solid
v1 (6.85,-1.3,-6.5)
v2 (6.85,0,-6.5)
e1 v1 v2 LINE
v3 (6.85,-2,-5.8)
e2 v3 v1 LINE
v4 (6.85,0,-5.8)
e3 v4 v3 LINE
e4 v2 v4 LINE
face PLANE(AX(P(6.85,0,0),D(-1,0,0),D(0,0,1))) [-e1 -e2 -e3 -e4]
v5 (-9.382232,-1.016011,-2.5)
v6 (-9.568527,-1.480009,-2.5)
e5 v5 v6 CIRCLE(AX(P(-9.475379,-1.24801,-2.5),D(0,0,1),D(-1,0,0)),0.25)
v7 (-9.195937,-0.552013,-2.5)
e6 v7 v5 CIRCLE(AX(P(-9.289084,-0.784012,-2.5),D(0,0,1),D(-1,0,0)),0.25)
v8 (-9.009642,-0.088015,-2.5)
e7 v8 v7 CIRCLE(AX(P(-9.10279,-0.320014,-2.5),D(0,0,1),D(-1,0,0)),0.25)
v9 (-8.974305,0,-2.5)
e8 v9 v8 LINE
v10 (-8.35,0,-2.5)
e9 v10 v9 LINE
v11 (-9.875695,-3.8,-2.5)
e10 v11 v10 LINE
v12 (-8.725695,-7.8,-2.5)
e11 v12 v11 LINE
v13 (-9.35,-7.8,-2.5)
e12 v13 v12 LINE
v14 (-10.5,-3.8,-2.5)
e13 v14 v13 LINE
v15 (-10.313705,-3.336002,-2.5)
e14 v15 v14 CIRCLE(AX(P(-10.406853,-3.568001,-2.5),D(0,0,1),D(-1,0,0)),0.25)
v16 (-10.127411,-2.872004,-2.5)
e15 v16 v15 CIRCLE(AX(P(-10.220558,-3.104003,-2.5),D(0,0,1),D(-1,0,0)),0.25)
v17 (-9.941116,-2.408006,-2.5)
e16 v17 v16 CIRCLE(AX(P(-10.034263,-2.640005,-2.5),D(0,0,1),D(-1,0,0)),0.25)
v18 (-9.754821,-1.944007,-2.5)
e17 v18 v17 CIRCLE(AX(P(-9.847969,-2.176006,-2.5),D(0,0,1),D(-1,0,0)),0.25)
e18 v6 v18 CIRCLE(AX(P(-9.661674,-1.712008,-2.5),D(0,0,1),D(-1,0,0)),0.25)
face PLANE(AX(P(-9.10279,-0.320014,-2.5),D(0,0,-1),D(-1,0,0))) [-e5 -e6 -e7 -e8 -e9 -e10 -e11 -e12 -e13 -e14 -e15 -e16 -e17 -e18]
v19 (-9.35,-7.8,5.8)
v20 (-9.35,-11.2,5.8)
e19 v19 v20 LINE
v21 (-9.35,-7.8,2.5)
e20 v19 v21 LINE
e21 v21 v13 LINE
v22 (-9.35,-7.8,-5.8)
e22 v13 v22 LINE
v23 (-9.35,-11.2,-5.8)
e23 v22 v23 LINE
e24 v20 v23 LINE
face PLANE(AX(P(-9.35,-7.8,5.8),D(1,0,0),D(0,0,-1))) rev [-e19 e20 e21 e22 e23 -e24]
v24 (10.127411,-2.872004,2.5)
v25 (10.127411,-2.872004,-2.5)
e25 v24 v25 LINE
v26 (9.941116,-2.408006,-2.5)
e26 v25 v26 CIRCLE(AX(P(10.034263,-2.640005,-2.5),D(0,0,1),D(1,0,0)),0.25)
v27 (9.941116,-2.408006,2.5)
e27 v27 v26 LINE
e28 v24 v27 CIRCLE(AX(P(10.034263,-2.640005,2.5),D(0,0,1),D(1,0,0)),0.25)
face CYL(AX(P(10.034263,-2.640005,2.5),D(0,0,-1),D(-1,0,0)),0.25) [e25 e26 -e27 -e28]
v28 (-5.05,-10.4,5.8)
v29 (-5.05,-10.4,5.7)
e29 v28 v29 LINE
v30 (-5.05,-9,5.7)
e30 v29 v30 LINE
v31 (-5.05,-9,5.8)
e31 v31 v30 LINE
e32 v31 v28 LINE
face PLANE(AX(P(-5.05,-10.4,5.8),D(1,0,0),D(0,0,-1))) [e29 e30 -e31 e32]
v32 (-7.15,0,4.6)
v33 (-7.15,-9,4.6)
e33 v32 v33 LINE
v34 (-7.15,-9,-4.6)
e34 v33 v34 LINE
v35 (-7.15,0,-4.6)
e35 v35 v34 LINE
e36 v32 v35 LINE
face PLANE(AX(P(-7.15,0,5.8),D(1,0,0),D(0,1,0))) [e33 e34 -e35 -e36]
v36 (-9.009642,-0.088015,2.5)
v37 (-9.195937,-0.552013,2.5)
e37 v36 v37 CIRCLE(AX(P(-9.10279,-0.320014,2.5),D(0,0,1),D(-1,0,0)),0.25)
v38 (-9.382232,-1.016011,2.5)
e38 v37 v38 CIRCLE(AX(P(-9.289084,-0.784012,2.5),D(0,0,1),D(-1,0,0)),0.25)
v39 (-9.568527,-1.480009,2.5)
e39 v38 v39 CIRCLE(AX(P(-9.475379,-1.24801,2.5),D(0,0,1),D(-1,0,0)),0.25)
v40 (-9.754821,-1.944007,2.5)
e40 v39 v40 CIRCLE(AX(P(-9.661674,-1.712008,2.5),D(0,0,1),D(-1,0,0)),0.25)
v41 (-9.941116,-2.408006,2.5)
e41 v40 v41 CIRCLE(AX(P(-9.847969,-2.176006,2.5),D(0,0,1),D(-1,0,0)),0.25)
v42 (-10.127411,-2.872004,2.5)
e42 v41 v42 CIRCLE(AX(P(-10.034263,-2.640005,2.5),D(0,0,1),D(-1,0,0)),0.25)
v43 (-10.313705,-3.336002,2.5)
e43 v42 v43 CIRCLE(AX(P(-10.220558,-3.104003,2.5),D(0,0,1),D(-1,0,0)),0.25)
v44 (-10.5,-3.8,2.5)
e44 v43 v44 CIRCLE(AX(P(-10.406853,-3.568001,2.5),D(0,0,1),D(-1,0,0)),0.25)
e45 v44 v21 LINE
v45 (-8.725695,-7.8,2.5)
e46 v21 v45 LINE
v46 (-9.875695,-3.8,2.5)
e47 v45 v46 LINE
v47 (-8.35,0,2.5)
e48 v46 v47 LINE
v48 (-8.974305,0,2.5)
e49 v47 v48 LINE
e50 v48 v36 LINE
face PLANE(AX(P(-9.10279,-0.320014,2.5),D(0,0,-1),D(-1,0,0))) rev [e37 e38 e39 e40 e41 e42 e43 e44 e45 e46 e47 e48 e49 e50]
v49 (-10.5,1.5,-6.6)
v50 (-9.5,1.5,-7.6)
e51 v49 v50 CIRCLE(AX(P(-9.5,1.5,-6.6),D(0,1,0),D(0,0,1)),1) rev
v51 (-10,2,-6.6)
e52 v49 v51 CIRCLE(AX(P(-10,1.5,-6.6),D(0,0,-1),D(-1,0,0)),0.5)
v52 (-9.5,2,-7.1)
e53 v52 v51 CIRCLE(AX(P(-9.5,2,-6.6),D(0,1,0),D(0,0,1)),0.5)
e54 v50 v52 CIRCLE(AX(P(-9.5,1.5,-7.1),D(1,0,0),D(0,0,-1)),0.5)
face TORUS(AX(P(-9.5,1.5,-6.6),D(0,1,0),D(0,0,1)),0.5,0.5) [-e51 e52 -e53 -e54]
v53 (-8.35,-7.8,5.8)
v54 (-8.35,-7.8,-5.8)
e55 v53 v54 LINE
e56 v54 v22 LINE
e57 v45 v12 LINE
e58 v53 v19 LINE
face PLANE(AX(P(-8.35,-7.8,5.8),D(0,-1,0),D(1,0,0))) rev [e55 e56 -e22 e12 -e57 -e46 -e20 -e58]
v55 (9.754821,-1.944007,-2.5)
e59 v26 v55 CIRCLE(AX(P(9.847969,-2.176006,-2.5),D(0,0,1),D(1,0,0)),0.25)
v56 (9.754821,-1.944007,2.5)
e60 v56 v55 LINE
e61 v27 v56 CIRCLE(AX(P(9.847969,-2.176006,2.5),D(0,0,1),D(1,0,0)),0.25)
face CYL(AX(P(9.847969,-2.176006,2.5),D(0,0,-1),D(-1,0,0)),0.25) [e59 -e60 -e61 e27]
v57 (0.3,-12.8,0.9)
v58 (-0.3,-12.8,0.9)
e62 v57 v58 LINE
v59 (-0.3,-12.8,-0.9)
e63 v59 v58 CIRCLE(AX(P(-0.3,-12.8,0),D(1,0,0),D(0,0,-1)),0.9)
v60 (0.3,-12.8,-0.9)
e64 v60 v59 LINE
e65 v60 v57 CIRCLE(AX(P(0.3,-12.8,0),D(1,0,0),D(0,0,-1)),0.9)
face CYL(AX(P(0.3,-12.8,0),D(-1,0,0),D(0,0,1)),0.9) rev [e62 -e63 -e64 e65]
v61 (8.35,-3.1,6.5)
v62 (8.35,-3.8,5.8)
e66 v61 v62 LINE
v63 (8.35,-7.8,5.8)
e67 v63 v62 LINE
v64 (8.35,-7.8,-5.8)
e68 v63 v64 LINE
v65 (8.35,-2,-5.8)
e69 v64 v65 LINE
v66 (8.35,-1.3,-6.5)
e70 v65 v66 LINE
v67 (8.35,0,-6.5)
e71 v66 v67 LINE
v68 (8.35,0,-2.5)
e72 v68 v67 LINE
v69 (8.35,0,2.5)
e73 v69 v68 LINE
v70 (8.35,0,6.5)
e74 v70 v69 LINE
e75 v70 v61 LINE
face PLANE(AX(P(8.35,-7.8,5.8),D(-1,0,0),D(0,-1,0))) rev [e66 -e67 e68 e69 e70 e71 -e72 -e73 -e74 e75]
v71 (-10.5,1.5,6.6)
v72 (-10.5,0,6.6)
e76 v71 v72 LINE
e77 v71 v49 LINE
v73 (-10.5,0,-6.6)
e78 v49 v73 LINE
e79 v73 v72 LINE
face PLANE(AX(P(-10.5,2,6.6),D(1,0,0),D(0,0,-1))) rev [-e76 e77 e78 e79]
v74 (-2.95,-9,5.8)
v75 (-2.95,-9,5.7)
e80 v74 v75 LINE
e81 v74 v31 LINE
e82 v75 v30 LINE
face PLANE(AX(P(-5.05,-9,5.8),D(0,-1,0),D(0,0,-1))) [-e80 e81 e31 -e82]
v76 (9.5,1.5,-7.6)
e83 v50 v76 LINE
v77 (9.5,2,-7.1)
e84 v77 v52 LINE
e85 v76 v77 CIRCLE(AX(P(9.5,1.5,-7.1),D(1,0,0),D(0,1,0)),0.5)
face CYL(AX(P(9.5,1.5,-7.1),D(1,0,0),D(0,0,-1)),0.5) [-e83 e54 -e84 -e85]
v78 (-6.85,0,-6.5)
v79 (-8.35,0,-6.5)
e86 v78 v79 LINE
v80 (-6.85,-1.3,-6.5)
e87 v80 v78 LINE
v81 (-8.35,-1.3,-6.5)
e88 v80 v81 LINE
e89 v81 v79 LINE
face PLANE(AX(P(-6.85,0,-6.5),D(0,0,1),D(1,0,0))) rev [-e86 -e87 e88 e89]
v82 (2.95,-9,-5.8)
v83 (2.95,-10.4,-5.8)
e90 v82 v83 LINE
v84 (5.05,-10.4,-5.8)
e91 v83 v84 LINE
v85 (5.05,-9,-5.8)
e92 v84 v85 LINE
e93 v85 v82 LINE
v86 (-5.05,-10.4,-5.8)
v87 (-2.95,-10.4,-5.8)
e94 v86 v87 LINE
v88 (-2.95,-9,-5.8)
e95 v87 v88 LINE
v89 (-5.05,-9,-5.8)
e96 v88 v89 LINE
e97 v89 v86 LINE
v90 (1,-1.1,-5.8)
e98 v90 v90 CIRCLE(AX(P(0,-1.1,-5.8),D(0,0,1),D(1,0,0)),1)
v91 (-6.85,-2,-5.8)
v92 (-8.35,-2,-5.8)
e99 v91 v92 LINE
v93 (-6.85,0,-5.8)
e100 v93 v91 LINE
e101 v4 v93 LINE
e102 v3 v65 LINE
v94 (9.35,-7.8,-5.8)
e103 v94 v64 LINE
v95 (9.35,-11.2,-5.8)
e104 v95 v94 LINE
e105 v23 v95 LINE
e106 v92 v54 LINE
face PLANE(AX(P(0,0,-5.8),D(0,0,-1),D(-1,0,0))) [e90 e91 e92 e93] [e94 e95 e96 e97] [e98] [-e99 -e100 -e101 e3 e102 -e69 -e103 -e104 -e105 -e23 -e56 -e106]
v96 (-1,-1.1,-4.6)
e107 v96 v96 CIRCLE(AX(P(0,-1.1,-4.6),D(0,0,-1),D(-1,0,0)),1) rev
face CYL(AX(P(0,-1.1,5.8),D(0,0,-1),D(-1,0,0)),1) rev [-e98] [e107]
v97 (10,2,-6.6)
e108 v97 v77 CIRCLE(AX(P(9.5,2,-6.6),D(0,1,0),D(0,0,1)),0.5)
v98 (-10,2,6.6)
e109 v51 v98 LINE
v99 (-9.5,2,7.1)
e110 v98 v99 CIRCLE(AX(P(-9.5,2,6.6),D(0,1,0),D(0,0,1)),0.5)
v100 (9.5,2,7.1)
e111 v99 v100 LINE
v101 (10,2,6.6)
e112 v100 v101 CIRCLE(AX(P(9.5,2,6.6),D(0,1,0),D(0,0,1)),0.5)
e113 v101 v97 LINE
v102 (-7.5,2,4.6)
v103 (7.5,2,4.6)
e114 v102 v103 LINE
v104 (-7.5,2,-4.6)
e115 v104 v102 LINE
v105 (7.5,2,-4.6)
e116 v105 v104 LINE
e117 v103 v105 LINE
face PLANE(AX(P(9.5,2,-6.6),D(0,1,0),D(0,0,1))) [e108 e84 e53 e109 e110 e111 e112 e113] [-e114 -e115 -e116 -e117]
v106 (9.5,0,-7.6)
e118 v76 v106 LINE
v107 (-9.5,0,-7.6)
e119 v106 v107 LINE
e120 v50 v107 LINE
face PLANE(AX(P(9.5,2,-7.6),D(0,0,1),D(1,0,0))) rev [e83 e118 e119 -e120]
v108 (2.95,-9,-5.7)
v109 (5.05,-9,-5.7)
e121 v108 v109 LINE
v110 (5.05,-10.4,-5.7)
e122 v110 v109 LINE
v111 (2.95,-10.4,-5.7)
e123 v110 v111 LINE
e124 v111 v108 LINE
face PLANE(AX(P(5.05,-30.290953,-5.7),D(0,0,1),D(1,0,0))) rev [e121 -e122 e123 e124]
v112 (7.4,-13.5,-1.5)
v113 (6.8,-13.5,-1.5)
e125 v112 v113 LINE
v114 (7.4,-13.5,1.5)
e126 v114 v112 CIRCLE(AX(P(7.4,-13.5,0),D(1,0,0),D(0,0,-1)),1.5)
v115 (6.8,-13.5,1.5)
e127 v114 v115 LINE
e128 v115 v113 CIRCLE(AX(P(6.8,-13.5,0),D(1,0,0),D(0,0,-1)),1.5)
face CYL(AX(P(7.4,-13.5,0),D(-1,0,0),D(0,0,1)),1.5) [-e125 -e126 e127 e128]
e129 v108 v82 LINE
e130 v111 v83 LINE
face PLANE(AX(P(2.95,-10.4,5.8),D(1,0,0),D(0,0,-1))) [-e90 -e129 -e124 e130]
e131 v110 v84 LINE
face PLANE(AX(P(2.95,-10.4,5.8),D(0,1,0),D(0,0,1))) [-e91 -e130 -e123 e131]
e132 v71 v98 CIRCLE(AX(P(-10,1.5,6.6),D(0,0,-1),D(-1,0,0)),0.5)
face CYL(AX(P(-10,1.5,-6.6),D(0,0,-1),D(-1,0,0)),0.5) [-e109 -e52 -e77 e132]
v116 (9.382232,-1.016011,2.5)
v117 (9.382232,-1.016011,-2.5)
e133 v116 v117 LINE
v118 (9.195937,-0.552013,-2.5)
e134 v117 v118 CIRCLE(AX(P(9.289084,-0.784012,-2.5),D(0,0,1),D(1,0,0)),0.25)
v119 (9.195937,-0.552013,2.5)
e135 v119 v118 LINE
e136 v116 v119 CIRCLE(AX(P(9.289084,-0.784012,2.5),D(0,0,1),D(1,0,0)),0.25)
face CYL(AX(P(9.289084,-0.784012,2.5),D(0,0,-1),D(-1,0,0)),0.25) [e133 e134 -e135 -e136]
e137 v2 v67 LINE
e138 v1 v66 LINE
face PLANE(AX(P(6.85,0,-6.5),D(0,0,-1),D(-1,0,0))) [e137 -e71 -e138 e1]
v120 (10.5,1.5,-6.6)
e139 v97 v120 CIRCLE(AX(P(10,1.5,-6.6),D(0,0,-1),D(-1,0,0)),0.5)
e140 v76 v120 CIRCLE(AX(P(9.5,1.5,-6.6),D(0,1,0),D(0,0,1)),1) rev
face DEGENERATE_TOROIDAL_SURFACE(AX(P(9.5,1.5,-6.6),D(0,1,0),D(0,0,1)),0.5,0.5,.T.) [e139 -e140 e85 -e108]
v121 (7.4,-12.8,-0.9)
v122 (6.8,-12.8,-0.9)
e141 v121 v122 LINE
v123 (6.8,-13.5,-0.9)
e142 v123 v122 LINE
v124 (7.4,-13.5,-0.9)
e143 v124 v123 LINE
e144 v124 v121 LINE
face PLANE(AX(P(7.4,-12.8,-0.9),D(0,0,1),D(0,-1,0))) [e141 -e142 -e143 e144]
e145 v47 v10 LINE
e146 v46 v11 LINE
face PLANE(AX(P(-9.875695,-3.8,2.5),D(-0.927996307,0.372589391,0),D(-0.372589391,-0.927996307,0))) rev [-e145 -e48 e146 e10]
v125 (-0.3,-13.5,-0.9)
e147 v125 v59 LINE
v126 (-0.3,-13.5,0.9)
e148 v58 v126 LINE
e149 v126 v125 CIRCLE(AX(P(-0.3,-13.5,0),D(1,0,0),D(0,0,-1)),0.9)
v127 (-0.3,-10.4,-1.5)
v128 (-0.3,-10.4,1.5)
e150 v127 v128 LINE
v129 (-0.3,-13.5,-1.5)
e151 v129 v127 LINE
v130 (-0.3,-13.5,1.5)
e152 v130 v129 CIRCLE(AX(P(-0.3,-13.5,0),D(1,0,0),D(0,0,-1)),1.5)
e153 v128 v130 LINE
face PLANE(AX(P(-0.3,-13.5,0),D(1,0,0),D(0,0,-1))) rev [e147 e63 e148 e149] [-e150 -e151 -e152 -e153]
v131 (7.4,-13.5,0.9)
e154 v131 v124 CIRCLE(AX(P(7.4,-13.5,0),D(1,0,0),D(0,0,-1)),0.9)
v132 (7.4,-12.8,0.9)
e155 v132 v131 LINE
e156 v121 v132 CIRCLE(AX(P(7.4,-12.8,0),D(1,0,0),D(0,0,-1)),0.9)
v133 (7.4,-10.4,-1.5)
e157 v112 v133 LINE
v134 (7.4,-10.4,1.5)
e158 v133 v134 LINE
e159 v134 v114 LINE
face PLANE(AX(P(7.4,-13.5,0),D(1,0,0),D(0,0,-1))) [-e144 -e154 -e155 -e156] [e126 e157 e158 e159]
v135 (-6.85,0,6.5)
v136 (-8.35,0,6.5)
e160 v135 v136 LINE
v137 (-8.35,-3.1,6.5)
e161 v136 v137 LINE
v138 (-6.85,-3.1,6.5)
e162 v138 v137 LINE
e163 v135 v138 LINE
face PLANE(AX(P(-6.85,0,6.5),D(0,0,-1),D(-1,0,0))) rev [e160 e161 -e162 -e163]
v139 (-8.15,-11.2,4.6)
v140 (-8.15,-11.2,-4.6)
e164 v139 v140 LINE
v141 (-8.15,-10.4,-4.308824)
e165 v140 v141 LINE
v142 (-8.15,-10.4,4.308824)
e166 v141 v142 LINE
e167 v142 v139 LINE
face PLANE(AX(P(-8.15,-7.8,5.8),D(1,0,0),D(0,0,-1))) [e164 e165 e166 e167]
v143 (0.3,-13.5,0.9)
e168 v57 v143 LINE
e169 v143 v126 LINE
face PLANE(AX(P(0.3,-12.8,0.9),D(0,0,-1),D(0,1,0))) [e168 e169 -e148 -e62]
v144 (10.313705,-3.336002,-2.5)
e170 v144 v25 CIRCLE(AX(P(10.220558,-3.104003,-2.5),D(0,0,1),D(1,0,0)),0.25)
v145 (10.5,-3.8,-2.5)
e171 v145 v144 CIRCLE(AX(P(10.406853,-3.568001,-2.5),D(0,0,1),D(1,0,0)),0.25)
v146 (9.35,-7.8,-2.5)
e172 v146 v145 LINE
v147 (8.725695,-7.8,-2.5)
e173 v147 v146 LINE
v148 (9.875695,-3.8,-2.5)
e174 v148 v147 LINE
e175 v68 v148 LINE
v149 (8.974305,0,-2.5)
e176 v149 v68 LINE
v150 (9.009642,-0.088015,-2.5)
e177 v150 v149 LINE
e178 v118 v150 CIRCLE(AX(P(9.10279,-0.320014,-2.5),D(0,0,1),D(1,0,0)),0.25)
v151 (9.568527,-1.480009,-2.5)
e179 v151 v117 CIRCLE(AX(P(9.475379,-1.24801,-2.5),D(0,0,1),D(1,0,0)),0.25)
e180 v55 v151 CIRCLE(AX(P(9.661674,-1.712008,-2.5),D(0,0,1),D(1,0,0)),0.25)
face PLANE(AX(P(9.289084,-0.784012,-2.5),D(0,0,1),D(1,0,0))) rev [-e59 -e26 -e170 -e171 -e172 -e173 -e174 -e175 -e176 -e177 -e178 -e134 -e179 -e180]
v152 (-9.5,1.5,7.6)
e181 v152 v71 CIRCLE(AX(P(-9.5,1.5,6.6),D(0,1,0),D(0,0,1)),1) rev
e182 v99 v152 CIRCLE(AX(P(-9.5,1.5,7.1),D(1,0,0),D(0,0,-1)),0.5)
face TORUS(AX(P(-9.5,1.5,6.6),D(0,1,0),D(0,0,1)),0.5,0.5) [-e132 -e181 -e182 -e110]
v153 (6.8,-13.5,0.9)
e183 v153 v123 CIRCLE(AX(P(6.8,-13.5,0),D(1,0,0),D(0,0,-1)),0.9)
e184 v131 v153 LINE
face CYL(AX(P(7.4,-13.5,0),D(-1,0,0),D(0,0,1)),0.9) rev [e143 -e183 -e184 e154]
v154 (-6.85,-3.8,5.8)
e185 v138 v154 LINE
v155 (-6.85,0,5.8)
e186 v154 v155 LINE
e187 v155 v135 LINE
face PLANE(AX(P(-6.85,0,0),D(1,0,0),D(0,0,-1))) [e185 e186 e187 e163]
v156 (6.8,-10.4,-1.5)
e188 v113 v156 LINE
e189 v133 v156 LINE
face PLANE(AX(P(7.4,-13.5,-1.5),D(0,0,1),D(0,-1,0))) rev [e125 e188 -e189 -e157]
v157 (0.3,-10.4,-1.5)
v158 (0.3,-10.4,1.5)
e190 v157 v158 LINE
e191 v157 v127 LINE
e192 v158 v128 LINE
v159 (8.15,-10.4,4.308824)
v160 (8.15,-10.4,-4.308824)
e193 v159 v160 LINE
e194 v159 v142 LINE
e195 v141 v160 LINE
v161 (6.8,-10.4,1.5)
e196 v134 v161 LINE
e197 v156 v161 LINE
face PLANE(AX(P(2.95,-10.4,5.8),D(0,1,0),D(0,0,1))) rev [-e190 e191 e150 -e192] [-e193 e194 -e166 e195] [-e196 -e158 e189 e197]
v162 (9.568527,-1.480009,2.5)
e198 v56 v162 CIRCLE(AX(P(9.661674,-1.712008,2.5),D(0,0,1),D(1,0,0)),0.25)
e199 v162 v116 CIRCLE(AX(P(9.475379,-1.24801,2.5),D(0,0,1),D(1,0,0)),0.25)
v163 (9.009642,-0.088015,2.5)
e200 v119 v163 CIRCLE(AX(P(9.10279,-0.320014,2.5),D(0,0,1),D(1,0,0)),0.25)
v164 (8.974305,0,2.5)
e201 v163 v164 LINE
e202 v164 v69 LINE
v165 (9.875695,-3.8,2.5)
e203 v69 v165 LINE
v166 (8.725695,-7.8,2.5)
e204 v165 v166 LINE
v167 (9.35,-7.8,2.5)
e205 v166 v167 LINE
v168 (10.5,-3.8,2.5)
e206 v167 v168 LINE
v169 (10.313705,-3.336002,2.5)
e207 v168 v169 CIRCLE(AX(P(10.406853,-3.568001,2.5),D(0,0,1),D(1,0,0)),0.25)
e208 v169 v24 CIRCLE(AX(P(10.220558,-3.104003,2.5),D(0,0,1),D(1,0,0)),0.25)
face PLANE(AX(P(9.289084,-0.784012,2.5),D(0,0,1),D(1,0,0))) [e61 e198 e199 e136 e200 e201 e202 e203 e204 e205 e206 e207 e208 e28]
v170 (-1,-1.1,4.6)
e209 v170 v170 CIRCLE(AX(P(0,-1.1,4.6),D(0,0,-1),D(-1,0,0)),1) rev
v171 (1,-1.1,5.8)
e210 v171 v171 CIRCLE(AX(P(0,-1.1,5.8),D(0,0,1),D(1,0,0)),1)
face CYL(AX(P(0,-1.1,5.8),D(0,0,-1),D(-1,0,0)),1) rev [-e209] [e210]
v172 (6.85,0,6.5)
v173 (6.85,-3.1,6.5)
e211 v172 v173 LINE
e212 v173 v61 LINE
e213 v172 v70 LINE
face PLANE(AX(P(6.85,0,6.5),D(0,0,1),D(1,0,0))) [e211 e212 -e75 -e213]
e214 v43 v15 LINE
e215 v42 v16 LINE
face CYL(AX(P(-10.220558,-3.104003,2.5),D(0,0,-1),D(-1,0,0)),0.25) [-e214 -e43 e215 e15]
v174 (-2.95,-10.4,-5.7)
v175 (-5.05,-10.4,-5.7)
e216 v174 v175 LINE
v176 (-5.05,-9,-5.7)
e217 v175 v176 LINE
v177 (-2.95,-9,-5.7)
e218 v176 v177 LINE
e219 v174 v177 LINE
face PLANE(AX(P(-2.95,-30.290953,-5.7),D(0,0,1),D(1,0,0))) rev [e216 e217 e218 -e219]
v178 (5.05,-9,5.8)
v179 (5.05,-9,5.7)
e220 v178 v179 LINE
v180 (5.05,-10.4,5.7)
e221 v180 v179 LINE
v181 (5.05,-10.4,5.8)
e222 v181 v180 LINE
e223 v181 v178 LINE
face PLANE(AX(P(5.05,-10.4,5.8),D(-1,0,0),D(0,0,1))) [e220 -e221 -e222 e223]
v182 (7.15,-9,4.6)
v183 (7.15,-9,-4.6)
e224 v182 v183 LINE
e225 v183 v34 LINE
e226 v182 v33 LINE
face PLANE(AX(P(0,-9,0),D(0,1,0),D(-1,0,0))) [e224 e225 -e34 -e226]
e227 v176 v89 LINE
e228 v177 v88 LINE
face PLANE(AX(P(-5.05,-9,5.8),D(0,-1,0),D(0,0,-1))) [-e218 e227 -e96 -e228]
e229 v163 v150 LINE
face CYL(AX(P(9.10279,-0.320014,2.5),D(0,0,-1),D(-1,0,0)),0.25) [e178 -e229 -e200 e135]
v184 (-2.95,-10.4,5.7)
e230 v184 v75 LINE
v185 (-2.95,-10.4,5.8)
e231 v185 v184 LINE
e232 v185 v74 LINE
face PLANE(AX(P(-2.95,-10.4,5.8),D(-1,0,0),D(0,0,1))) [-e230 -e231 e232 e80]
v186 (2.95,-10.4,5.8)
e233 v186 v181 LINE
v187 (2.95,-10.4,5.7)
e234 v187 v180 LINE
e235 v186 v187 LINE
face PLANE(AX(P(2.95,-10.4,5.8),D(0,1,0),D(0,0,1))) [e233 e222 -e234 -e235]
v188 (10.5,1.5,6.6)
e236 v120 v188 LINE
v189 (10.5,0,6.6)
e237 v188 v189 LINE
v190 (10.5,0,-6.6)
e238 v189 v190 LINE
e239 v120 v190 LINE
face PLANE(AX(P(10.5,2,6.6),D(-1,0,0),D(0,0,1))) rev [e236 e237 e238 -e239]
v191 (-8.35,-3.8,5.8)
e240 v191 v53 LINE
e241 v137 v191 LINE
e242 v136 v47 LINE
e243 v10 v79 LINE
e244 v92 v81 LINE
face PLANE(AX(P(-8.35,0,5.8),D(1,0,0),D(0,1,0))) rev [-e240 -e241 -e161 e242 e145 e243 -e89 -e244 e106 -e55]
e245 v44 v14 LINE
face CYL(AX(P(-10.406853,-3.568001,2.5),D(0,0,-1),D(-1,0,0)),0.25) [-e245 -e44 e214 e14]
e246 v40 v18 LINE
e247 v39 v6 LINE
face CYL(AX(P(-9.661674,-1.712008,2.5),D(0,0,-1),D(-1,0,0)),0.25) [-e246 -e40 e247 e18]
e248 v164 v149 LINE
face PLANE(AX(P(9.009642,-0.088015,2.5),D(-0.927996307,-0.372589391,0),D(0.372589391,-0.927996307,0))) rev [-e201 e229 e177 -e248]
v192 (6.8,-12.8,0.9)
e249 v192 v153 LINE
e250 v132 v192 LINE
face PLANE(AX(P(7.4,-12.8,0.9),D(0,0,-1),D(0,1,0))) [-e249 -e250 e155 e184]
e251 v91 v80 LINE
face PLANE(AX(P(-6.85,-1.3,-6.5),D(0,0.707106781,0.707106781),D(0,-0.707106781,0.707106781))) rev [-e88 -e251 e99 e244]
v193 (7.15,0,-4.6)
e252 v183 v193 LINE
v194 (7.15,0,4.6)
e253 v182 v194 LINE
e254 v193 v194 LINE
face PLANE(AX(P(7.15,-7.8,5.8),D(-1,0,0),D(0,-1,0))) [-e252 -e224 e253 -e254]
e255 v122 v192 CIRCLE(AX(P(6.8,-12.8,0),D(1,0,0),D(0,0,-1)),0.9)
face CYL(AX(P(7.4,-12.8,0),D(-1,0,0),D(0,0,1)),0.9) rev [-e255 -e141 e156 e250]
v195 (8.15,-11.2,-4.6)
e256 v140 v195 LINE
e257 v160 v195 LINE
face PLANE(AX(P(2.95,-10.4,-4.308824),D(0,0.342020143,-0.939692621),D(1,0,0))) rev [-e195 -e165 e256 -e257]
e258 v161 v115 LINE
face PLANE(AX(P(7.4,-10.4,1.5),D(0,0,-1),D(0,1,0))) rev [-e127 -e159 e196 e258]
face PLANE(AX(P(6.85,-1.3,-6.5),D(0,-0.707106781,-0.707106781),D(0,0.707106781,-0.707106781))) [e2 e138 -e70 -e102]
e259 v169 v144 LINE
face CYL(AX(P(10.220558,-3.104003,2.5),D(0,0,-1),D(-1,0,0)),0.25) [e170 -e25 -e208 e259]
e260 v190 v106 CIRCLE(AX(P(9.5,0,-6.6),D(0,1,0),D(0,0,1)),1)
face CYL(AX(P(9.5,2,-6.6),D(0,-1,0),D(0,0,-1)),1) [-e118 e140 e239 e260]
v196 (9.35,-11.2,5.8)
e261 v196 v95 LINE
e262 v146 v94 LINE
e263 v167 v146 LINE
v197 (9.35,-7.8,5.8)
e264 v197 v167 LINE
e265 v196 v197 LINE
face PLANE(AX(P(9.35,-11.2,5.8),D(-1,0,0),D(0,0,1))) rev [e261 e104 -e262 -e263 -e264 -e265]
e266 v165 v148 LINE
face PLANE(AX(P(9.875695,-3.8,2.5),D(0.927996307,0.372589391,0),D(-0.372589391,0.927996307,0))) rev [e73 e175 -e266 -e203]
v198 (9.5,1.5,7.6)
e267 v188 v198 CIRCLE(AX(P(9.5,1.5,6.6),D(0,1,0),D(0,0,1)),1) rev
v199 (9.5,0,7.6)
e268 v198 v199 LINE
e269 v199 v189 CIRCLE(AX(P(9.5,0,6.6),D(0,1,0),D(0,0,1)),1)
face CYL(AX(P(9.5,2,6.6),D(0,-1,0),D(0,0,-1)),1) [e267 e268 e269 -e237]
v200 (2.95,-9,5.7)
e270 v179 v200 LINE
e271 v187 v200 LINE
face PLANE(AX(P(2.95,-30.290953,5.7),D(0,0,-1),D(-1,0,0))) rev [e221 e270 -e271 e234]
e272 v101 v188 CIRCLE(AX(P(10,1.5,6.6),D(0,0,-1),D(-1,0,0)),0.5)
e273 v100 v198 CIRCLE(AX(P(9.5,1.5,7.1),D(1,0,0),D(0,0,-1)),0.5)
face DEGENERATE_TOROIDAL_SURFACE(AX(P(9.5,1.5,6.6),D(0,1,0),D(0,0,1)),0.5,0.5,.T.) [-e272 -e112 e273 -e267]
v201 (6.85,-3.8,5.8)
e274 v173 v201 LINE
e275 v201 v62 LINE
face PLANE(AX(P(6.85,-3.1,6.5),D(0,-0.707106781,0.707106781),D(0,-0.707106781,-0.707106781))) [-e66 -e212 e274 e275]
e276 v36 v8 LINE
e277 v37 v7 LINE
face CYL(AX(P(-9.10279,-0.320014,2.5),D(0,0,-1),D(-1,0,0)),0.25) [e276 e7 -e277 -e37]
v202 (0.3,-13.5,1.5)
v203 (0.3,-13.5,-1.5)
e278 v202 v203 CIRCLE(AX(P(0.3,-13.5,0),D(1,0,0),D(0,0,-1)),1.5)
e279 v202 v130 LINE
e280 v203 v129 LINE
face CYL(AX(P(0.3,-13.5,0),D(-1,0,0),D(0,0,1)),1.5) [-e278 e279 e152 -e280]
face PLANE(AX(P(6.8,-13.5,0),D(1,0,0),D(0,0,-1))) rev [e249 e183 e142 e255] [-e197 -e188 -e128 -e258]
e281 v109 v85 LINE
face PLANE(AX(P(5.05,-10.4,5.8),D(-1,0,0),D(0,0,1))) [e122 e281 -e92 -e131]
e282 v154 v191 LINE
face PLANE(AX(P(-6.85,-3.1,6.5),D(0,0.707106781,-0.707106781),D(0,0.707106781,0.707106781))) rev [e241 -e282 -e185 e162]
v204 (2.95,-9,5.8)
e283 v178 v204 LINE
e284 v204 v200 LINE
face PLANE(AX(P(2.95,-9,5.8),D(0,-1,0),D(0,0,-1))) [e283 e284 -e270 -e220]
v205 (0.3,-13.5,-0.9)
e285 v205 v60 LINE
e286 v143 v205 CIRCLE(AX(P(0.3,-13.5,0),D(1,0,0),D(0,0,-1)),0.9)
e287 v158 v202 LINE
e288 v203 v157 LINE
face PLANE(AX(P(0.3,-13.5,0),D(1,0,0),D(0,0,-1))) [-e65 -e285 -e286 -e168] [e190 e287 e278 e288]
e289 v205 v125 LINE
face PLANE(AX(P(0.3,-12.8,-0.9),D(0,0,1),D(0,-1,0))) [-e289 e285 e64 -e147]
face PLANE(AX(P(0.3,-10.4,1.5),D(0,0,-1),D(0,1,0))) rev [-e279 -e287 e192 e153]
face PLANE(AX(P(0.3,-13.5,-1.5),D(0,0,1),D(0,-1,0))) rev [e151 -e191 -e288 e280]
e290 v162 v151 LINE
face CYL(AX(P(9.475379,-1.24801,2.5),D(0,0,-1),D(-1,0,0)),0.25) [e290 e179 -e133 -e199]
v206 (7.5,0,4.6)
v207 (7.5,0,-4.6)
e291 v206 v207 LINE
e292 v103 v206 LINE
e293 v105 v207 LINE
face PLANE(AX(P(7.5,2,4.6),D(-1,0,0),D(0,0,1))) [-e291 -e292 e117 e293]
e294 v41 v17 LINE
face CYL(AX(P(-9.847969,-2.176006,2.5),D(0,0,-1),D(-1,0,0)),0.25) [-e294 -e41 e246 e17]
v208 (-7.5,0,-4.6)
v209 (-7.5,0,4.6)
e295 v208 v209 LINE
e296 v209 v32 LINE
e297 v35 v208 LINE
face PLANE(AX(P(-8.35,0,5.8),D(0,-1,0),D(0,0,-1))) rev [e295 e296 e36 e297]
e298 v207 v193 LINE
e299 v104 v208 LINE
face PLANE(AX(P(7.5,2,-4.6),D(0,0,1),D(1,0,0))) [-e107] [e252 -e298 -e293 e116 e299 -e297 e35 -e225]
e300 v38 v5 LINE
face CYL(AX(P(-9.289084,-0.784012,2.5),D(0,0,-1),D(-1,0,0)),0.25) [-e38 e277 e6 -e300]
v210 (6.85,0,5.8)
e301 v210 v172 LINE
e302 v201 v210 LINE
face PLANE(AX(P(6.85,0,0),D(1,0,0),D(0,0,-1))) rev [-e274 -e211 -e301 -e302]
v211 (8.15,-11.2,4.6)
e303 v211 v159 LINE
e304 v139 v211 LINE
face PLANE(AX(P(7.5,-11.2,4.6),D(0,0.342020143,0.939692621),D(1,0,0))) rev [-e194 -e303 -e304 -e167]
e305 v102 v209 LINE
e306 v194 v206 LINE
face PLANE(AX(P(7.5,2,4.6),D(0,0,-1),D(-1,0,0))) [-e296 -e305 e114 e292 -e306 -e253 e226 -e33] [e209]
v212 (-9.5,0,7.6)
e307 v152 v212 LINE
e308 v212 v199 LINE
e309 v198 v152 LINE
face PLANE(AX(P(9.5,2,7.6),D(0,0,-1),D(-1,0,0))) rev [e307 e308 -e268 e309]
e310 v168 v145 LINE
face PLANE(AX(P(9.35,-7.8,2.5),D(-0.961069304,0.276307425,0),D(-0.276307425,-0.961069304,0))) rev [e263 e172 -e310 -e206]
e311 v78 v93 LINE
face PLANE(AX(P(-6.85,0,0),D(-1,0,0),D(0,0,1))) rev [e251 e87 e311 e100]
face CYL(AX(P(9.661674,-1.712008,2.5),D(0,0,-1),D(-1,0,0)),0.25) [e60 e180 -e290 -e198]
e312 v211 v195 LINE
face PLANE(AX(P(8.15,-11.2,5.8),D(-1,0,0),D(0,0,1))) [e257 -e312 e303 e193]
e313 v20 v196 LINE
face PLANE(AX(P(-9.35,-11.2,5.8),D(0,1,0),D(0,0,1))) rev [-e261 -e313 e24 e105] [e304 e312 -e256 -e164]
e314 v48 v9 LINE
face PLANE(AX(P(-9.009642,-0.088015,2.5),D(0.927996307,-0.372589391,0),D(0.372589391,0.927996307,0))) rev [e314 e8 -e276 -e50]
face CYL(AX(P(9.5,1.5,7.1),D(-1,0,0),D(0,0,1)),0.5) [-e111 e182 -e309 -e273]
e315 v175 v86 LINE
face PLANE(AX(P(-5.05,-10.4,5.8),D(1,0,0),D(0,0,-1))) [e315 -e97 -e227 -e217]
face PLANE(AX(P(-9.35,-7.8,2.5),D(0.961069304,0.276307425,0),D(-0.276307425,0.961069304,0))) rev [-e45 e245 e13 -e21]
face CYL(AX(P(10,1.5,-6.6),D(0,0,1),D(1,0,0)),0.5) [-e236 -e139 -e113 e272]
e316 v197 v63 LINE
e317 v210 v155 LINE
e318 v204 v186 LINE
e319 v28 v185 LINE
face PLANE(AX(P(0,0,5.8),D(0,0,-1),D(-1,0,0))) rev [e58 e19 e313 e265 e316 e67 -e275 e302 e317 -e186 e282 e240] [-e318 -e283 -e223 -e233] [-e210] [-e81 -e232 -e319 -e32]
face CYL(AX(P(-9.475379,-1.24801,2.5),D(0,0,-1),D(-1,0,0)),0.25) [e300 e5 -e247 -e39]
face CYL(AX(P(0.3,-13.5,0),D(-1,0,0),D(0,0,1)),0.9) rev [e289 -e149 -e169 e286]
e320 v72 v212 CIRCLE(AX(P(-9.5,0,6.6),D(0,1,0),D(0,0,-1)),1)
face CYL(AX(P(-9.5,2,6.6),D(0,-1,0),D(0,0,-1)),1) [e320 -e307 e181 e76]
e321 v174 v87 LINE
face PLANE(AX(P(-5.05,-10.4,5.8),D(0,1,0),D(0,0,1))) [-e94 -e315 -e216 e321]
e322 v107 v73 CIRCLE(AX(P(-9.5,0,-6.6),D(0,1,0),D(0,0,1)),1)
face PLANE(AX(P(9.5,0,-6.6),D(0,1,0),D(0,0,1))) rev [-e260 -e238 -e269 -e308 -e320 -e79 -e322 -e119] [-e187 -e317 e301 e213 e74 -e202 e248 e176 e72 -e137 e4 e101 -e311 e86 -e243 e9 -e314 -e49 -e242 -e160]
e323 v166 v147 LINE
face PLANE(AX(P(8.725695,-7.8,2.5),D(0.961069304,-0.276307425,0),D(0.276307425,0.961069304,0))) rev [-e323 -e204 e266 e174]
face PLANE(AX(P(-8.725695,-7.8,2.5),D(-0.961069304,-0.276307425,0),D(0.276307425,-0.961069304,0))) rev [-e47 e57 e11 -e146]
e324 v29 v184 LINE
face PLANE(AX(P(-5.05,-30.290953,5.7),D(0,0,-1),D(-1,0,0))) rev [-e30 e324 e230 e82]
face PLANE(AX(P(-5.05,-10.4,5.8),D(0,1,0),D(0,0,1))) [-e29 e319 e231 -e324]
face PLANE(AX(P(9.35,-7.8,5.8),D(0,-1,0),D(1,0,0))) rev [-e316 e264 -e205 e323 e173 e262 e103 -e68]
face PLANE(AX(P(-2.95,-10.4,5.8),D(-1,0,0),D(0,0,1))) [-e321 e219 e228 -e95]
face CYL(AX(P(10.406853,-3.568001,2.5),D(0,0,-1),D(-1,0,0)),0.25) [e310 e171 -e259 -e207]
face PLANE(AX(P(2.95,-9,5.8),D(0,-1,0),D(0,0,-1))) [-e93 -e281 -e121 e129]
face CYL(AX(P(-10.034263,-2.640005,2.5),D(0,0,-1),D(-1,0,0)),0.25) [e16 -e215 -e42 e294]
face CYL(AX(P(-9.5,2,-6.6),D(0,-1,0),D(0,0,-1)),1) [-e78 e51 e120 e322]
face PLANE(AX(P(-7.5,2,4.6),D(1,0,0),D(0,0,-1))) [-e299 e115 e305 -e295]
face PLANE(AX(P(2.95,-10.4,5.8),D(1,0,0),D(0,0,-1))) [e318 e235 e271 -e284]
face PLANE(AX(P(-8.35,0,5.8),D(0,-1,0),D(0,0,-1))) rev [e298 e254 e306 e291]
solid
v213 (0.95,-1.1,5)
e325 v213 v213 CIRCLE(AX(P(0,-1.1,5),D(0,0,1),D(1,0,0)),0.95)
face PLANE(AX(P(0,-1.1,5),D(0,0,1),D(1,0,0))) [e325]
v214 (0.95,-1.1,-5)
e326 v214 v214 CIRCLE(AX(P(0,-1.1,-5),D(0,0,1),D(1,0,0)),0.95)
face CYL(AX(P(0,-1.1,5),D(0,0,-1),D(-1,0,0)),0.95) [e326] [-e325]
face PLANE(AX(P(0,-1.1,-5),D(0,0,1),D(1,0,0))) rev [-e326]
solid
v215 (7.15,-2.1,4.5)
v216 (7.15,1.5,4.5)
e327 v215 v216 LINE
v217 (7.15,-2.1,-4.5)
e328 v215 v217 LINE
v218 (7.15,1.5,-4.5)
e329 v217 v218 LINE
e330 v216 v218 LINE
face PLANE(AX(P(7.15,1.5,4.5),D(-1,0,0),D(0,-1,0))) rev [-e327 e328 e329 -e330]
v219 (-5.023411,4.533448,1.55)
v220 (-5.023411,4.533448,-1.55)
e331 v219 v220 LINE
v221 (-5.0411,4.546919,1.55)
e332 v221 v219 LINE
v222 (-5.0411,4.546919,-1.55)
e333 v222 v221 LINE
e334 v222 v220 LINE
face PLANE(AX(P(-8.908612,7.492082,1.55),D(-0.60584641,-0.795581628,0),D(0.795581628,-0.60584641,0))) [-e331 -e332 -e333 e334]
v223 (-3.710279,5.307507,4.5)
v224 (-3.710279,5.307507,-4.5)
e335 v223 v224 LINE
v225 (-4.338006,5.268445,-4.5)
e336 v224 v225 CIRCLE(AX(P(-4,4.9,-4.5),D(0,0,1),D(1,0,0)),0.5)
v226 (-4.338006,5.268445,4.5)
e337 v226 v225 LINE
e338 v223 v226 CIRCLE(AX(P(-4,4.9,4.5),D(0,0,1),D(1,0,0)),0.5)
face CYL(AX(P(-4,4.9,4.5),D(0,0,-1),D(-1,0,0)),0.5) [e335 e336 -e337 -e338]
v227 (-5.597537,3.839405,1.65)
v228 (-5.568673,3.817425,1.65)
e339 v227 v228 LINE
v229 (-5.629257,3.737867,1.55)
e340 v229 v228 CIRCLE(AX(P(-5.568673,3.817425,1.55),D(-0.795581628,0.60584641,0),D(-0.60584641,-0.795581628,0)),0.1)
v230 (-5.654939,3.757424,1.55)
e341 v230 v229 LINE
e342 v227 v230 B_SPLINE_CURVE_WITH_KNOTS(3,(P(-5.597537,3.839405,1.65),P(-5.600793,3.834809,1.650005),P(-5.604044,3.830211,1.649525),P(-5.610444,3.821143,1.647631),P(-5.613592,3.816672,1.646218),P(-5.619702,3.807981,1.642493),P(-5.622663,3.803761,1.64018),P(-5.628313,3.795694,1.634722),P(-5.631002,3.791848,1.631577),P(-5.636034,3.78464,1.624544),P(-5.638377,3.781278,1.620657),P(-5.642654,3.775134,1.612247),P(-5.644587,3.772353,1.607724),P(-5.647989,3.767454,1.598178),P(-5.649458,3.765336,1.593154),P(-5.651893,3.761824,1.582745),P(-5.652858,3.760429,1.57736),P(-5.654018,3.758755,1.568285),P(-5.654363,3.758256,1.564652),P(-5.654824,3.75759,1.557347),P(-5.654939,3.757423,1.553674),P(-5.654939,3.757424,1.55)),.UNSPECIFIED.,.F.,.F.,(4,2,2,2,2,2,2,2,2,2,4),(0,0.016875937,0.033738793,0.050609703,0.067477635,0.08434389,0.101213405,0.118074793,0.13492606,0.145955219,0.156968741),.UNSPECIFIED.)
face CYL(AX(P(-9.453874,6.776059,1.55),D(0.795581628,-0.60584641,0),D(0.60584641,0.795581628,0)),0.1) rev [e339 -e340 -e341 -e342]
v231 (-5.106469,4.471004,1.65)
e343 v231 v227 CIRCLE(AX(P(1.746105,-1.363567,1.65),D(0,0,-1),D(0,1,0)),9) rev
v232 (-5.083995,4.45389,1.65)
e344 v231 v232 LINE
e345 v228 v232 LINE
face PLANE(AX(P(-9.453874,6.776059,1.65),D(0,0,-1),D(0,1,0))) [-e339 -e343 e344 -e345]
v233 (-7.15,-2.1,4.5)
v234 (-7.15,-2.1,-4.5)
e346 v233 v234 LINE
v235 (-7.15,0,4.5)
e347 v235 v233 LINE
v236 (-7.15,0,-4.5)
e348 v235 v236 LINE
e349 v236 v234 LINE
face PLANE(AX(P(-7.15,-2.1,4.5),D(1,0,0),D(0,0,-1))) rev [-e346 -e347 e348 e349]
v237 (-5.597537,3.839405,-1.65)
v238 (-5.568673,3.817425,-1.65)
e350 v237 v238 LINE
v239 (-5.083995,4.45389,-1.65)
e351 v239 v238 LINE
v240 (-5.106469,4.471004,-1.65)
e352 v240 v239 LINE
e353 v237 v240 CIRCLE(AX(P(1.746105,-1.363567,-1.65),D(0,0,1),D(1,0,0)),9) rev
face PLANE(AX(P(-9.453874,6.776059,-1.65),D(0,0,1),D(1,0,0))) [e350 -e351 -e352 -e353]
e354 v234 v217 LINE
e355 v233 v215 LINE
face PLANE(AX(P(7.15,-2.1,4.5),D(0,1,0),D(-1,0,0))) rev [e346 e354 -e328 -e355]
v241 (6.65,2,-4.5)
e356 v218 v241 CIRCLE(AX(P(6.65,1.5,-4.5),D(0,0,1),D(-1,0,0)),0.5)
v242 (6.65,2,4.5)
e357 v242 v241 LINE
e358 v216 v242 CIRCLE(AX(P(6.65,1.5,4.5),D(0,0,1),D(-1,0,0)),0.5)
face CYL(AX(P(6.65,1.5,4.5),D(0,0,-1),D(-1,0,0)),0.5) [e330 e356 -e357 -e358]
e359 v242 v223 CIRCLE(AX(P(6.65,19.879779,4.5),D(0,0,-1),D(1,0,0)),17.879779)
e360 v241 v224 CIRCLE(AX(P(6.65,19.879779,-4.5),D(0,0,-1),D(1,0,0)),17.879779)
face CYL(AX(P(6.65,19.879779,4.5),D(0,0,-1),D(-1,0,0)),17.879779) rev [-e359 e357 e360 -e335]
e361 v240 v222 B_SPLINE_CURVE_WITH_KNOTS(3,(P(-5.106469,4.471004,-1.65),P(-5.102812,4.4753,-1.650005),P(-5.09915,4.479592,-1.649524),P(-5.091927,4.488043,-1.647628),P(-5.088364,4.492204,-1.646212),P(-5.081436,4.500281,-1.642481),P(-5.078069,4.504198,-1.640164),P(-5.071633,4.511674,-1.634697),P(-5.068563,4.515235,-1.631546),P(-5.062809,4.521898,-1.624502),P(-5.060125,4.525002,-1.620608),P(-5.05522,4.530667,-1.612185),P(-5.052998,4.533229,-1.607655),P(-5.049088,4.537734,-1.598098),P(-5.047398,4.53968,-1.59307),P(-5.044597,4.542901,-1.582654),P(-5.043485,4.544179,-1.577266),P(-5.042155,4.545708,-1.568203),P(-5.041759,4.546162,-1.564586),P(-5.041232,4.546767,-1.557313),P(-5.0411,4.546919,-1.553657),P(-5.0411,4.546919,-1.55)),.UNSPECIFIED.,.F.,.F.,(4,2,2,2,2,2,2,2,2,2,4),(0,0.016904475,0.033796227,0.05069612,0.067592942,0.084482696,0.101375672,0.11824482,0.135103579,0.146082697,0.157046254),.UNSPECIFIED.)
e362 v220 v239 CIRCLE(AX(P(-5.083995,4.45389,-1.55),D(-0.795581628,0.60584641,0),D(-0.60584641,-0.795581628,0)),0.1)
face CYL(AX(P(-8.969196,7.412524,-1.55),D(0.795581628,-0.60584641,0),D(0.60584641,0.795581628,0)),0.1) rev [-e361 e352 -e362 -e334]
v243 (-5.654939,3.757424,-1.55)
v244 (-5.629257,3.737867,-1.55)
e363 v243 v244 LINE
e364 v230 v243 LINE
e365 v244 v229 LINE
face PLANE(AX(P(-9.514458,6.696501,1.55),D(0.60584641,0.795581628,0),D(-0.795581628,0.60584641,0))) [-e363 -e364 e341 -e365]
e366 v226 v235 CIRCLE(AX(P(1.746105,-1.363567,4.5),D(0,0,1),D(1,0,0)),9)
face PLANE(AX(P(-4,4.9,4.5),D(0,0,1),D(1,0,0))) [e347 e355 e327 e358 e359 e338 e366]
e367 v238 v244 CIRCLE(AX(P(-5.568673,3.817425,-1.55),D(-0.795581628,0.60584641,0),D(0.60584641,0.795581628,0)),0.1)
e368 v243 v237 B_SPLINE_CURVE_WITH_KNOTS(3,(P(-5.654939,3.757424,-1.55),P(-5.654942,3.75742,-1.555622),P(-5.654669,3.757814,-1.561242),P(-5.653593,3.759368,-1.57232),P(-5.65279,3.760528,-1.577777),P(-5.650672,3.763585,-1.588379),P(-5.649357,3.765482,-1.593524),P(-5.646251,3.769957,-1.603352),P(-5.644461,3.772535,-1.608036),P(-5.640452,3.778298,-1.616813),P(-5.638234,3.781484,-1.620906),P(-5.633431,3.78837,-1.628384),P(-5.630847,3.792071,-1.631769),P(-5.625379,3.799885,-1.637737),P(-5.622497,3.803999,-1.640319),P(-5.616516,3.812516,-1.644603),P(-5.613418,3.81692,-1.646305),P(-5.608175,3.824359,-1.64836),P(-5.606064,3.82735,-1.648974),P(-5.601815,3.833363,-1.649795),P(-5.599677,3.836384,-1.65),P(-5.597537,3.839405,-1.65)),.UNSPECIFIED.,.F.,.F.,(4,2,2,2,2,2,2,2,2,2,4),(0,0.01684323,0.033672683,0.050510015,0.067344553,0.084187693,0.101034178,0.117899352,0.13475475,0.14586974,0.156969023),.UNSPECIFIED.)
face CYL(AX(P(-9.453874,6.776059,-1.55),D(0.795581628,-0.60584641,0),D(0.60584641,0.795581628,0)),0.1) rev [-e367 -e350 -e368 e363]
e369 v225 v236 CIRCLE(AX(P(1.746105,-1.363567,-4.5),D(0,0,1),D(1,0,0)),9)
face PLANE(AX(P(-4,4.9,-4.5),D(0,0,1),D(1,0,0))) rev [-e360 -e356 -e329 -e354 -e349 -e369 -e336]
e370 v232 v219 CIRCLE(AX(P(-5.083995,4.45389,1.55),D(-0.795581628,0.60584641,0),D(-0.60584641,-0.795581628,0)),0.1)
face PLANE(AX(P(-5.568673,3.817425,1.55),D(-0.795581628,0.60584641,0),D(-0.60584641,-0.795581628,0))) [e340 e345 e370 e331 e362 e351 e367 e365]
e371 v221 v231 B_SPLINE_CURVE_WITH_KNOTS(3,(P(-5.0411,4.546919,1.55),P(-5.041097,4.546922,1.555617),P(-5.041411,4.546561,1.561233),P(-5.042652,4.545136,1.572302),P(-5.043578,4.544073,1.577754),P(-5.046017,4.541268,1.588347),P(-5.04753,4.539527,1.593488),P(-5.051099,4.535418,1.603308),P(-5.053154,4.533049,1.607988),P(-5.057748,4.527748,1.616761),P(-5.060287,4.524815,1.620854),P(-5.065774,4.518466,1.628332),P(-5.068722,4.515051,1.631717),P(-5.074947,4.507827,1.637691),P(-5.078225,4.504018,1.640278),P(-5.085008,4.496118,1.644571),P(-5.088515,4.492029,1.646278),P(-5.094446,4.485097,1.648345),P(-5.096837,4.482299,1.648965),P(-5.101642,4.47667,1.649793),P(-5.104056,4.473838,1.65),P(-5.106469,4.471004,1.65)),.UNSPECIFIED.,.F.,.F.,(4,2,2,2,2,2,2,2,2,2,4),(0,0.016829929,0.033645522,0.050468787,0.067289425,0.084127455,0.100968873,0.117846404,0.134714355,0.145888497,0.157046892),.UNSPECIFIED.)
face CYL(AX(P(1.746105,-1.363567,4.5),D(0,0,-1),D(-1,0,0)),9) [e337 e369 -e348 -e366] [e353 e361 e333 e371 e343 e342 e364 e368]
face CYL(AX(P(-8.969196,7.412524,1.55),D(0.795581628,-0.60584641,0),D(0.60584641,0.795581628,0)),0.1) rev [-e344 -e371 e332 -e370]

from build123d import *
from OCP.BRepFilletAPI import BRepFilletAPI_MakeChamfer

# Parameters (mm, degrees)
SKETCH1_W               = 15
SKETCH1_H               = 9.2
BOSS_EXTRUDE1_DEPTH     = 2
FILLET1_R               = 0.5
SKETCH2_R               = 1
SKETCH2_W               = 2.1
SKETCH2_H               = 1.4
BOSS_EXTRUDE4_DEPTH     = 5.8
SHELL1_START            = -11.2
SHELL1_OUTLINE_W        = 14.3
SHELL1_OUTLINE_H        = 9.2
SHELL1_DEPTH            = 11.2
SHELL1_2_OUTLINE_W      = 1
SHELL1_2_OUTLINE_H      = 9.2
SHELL1_2_DEPTH          = 2.2
BOSS_EXTRUDE5_DEPTH     = 1.4
CHAMFER1_SIZE           = 0.291176187
CHAMFER1_SIZE_2         = 0.8
BOSS_EXTRUDE6_DEPTH     = 0.3
BOSS_EXTRUDE7_START     = 7.4
BOSS_EXTRUDE7_DEPTH     = 0.6
BOSS_EXTRUDE8_DEPTH     = 4.5
SKETCH6_R               = 0.95
BOSS_EXTRUDE9_DEPTH     = 5
CUT_EXTRUDE2_REACH      = 27.963
CUT_EXTRUDE2_END_RADIUS = 9
CUT_EXTRUDE2_START      = 0.1
BOSS_EXTRUDE10_START    = 8.35
BOSS_EXTRUDE10_DEPTH    = 1.5
BOSS_EXTRUDE11_START    = -8.35
BOSS_EXTRUDE11_DEPTH    = 1.5
BOSS_EXTRUDE12_DEPTH    = 2.5


# Read off the part's stored shape, not the designer's step: Shell1
with BuildPart() as part:
    # Sketch1 → Boss-Extrude1 (new body)
    with BuildSketch(Plane(origin=(0, 0, 0), x_dir=(1, 0, 0), z_dir=(0, 1, 0))):
        with BuildLine():
            Line((9.5, -7.6), (-9.5, -7.6))
            ThreePointArc((-9.5, -7.6), (-10.207106781, -7.307106781), (-10.5, -6.6))
            Line((-10.5, -6.6), (-10.5, 6.6))
            ThreePointArc((-10.5, 6.6), (-10.207106781, 7.307106781), (-9.5, 7.6))
            Line((-9.5, 7.6), (9.5, 7.6))
            ThreePointArc((9.5, 7.6), (10.207106781, 7.307106781), (10.5, 6.6))
            Line((10.5, 6.6), (10.5, -6.6))
            ThreePointArc((10.5, -6.6), (10.207106781, -7.307106781), (9.5, -7.6))
        make_face()
        Rectangle(SKETCH1_W, SKETCH1_H, mode=Mode.SUBTRACT)
    extrude(amount=BOSS_EXTRUDE1_DEPTH)

    # Fillet1
    fillet1_edges = [part.edges().sort_by_distance(p)[0] for p in [
        (-10.207106781, 2, -7.307106781),
        (-10.5, 2, 0),
        (-10.207106781, 2, 7.307106781),
        (0, 2, 7.6),
        (10.207106781, 2, 7.307106781),
        (10.5, 2, 0),
        (10.207106781, 2, -7.307106781),
        (0, 2, -7.6),
    ]]
    fillet(fillet1_edges, radius=FILLET1_R)

    # Sketch2 → Boss-Extrude4 (add, symmetric)
    with BuildSketch(Plane.XY):
        Polygon((-8.35, 0), (8.35, 0), (8.35, -7.8), (9.35, -7.8), (9.35, -11.2), (-9.35, -11.2), (-9.35, -7.8), (-8.35, -7.8), align=None)
        with Locations((0, -1.1)):
            Circle(SKETCH2_R, mode=Mode.SUBTRACT)
        with Locations((-4, -9.7)):
            Rectangle(SKETCH2_W, SKETCH2_H, mode=Mode.SUBTRACT)
        with Locations((4, -9.7)):
            Rectangle(SKETCH2_W, SKETCH2_H, mode=Mode.SUBTRACT)
    extrude(amount=BOSS_EXTRUDE4_DEPTH, both=True)

    # Shell1 outline → Shell1 (cut)
    with BuildSketch(Plane(origin=(0, 0, 0), x_dir=(1, 0, 0), z_dir=(0, 1, 0)).offset(SHELL1_START)):
        Rectangle(SHELL1_OUTLINE_W, SHELL1_OUTLINE_H)
    extrude(amount=SHELL1_DEPTH, mode=Mode.SUBTRACT)

    # Shell1 2 outline → Shell1 2 (cut)
    with BuildSketch(Plane(origin=(0, 0, 0), x_dir=(1, 0, 0), z_dir=(0, 1, 0)).offset(SHELL1_START)):
        with Locations((7.65, 0)):
            Rectangle(SHELL1_2_OUTLINE_W, SHELL1_2_OUTLINE_H)
        with Locations((-7.65, 0)):
            Rectangle(SHELL1_2_OUTLINE_W, SHELL1_2_OUTLINE_H)
    extrude(amount=SHELL1_2_DEPTH, mode=Mode.SUBTRACT)

    # Sketch3 → Boss-Extrude5 (add)
    with BuildSketch(Plane.XZ.offset(9)):
        Polygon((-5.05, -4.6), (-8.15, -4.6), (-8.15, 4.6), (-5.05, 4.6), (-5.05, 5.7), (-2.95, 5.7), (-2.95, 4.6), (2.95, 4.6), (2.95, 5.7), (5.05, 5.7), (5.05, 4.6), (8.15, 4.6), (8.15, -4.6), (5.05, -4.6), (5.05, -5.7), (2.95, -5.7), (2.95, -4.6), (-2.95, -4.6), (-2.95, -5.7), (-5.05, -5.7), align=None)
    extrude(amount=BOSS_EXTRUDE5_DEPTH)

    # Chamfer1
    chamfer1_edges_1 = [part.edges().sort_by_distance(p)[0] for p in [
        (0, -10.4, -4.6),
    ]]
    chamfer1_side_1 = [part.faces().sort_by_distance(p)[0] for p in [
        (0, -10.4, -4.594176476),
    ]]
    chamfer1_edges_2 = [part.edges().sort_by_distance(p)[0] for p in [
        (0, -10.4, 4.6),
    ]]
    chamfer1_side_2 = [part.faces().sort_by_distance(p)[0] for p in [
        (0, -10.4, 4.594176476),
    ]]
    chamfer1 = BRepFilletAPI_MakeChamfer(part.part.solid().wrapped)
    for e in chamfer1_edges_1:
        chamfer1.Add(CHAMFER1_SIZE - 0.0001, CHAMFER1_SIZE_2 - 0.0001, e.wrapped, chamfer1_side_1[0].wrapped)
    for e in chamfer1_edges_2:
        chamfer1.Add(CHAMFER1_SIZE - 0.0001, CHAMFER1_SIZE_2 - 0.0001, e.wrapped, chamfer1_side_2[0].wrapped)
    add(Compound.cast(chamfer1.Shape()), mode=Mode.REPLACE)  # a hair under: the kernel refuses the full size

    # Sketch4 → Boss-Extrude6 (add, symmetric)
    with BuildSketch(Plane(origin=(0, 0, 0), x_dir=(0, 0, -1), z_dir=(1, 0, 0))):
        with BuildLine():
            Line((-1.5, -10.4), (1.5, -10.4))
            Line((1.5, -10.4), (1.5, -13.5))
            ThreePointArc((1.5, -13.5), (0, -15), (-1.5, -13.5))
            Line((-1.5, -13.5), (-1.5, -10.4))
        make_face()
        with BuildLine():
            Line((0.9, -12.8), (0.9, -13.5))
            ThreePointArc((0.9, -13.5), (0, -14.4), (-0.9, -13.5))
            Line((-0.9, -13.5), (-0.9, -12.8))
            ThreePointArc((-0.9, -12.8), (0, -11.9), (0.9, -12.8))
        make_face(mode=Mode.SUBTRACT)
    extrude(amount=BOSS_EXTRUDE6_DEPTH, both=True)

    # Sketch4<2> → Boss-Extrude7 (add)
    with BuildSketch(Plane(origin=(0, 0, 0), x_dir=(0, 0, -1), z_dir=(1, 0, 0)).offset(BOSS_EXTRUDE7_START)):
        with BuildLine():
            Line((-1.5, -10.4), (1.5, -10.4))
            Line((1.5, -10.4), (1.5, -13.5))
            ThreePointArc((1.5, -13.5), (0, -15), (-1.5, -13.5))
            Line((-1.5, -13.5), (-1.5, -10.4))
        make_face()
        with BuildLine():
            Line((0.9, -12.8), (0.9, -13.5))
            ThreePointArc((0.9, -13.5), (0, -14.4), (-0.9, -13.5))
            Line((-0.9, -13.5), (-0.9, -12.8))
            ThreePointArc((-0.9, -12.8), (0, -11.9), (0.9, -12.8))
        make_face(mode=Mode.SUBTRACT)
    extrude(amount=-BOSS_EXTRUDE7_DEPTH)

    # Sketch9 → Boss-Extrude10 (add)
    with BuildSketch(Plane(origin=(0, 0, 0), x_dir=(0, 0, -1), z_dir=(1, 0, 0)).offset(BOSS_EXTRUDE10_START)):
        Polygon((-5.8, 0), (-6.5, 0), (-6.5, -3.1), (-5.8, -3.8), align=None)
        Polygon((5.8, 0), (6.5, 0), (6.5, -1.3), (5.8, -2), align=None)
    extrude(amount=-BOSS_EXTRUDE10_DEPTH)

    # Sketch9<2> → Boss-Extrude11 (add)
    with BuildSketch(Plane(origin=(0, 0, 0), x_dir=(0, 0, -1), z_dir=(1, 0, 0)).offset(BOSS_EXTRUDE11_START)):
        Polygon((-5.8, 0), (-6.5, 0), (-6.5, -3.1), (-5.8, -3.8), align=None)
        Polygon((5.8, 0), (6.5, 0), (6.5, -1.3), (5.8, -2), align=None)
    extrude(amount=BOSS_EXTRUDE11_DEPTH)

    # Sketch10 → Boss-Extrude12 (add, symmetric)
    with BuildSketch(Plane.XY):
        with BuildLine():
            Line((-9.35, -7.8), (-10.5, -3.8))
            ThreePointArc((-10.5, -3.8), (-10.638851729, -3.474853576), (-10.313705305, -3.336001846))
            ThreePointArc((-10.313705305, -3.336001846), (-10.452557034, -3.010855422), (-10.127410609, -2.872003693))
            ThreePointArc((-10.127410609, -2.872003693), (-10.266262338, -2.546857268), (-9.941115914, -2.408005539))
            ThreePointArc((-9.941115914, -2.408005539), (-10.079967643, -2.082859115), (-9.754821219, -1.944007386))
            ThreePointArc((-9.754821219, -1.944007386), (-9.893672948, -1.618860961), (-9.568526523, -1.480009232))
            ThreePointArc((-9.568526523, -1.480009232), (-9.707378252, -1.154862808), (-9.382231828, -1.016011079))
            ThreePointArc((-9.382231828, -1.016011079), (-9.521083557, -0.690864654), (-9.195937133, -0.552012925))
            ThreePointArc((-9.195937133, -0.552012925), (-9.334788862, -0.226866501), (-9.009642437, -0.088014772))
            Line((-9.009642437, -0.088014772), (-8.974304613, 0))
            Line((-8.974304613, 0), (-8.35, 0))
            Line((-8.35, 0), (-9.875695387, -3.8))
            Line((-9.875695387, -3.8), (-8.725695387, -7.8))
            Line((-8.725695387, -7.8), (-9.35, -7.8))
        make_face()
        with BuildLine():
            Line((9.35, -7.8), (8.725695387, -7.8))
            Line((8.725695387, -7.8), (9.875695387, -3.8))
            Line((9.875695387, -3.8), (8.35, 0))
            Line((8.35, 0), (8.974304613, 0))
            Line((8.974304613, 0), (9.009642437, -0.088014772))
            ThreePointArc((9.009642437, -0.088014772), (9.334788862, -0.226866501), (9.195937133, -0.552012925))
            ThreePointArc((9.195937133, -0.552012925), (9.521083557, -0.690864654), (9.382231828, -1.016011079))
            ThreePointArc((9.382231828, -1.016011079), (9.707378252, -1.154862808), (9.568526523, -1.480009232))
            ThreePointArc((9.568526523, -1.480009232), (9.893672948, -1.618860961), (9.754821219, -1.944007386))
            ThreePointArc((9.754821219, -1.944007386), (10.079967643, -2.082859115), (9.941115914, -2.408005539))
            ThreePointArc((9.941115914, -2.408005539), (10.266262338, -2.546857268), (10.127410609, -2.872003693))
            ThreePointArc((10.127410609, -2.872003693), (10.452557034, -3.010855422), (10.313705305, -3.336001846))
            ThreePointArc((10.313705305, -3.336001846), (10.638851729, -3.474853576), (10.5, -3.8))
            Line((10.5, -3.8), (9.35, -7.8))
        make_face()
    extrude(amount=BOSS_EXTRUDE12_DEPTH, both=True)


with BuildPart() as body_2:
    # Sketch5 → Boss-Extrude8 (new, symmetric)
    with BuildSketch(Plane.XY):
        with BuildLine():
            Line((7.15, 1.5), (7.15, -2.1))
            Line((7.15, -2.1), (-7.15, -2.1))
            Line((-7.15, -2.1), (-7.15, 0))
            ThreePointArc((-7.15, 0), (-6.193721683, 2.874256564), (-4.338006175, 5.268445146))
            ThreePointArc((-4.338006175, 5.268445146), (-4.031053715, 5.399034735), (-3.710279439, 5.307507051))
            ThreePointArc((-3.710279439, 5.307507051), (1.212284649, 2.846935739), (6.65, 2))
            ThreePointArc((6.65, 2), (7.003553391, 1.853553391), (7.15, 1.5))
        make_face()
    extrude(amount=BOSS_EXTRUDE8_DEPTH, both=True)

    # Cut-Extrude2: up to this cylinder (the profile starts inside it)
    cut_extrude2_end = Plane(origin=(1.746104975, -1.363567484, 0), z_dir=(0, 0, -1)) * Cylinder(CUT_EXTRUDE2_END_RADIUS, 74.926, mode=Mode.PRIVATE)
    # Sketch7 → Cut-Extrude2 (cut, up to the surface)
    with BuildSketch(Plane(origin=(-5.285133561, 4.024702284, 0), x_dir=(0, 0, 1), z_dir=(-0.7955816281970499, 0.6058464103015969, 0)).offset(CUT_EXTRUDE2_START), mode=Mode.PRIVATE) as cut_extrude2_sk1:
        with BuildLine():
            Line((1.55, -0.436687302), (-1.55, -0.436687302))
            ThreePointArc((-1.55, -0.436687302), (-1.620710678, -0.40739798), (-1.65, -0.336687302))
            Line((-1.65, -0.336687302), (-1.65, 0.463312698))
            ThreePointArc((-1.65, 0.463312698), (-1.620710678, 0.534023377), (-1.55, 0.563312698))
            Line((-1.55, 0.563312698), (1.55, 0.563312698))
            ThreePointArc((1.55, 0.563312698), (1.620710678, 0.534023377), (1.65, 0.463312698))
            Line((1.65, 0.463312698), (1.65, -0.336687302))
            ThreePointArc((1.65, -0.336687302), (1.620710678, -0.40739798), (1.55, -0.436687302))
        make_face()
    cut_extrude2_tool1 = extrude(cut_extrude2_sk1.sketch, amount=CUT_EXTRUDE2_REACH, mode=Mode.PRIVATE) & cut_extrude2_end
    add(cut_extrude2_tool1.solids().sort_by_distance((-5.326334, 4.135657, 0))[0], mode=Mode.SUBTRACT)


with BuildPart() as body_3:
    # Sketch6 → Boss-Extrude9 (new, symmetric)
    with BuildSketch(Plane.XY):
        with Locations((0, -1.1)):
            Circle(SKETCH6_R)
    extrude(amount=BOSS_EXTRUDE9_DEPTH, both=True)


solid = Compound([part.part, body_2.part, body_3.part])
